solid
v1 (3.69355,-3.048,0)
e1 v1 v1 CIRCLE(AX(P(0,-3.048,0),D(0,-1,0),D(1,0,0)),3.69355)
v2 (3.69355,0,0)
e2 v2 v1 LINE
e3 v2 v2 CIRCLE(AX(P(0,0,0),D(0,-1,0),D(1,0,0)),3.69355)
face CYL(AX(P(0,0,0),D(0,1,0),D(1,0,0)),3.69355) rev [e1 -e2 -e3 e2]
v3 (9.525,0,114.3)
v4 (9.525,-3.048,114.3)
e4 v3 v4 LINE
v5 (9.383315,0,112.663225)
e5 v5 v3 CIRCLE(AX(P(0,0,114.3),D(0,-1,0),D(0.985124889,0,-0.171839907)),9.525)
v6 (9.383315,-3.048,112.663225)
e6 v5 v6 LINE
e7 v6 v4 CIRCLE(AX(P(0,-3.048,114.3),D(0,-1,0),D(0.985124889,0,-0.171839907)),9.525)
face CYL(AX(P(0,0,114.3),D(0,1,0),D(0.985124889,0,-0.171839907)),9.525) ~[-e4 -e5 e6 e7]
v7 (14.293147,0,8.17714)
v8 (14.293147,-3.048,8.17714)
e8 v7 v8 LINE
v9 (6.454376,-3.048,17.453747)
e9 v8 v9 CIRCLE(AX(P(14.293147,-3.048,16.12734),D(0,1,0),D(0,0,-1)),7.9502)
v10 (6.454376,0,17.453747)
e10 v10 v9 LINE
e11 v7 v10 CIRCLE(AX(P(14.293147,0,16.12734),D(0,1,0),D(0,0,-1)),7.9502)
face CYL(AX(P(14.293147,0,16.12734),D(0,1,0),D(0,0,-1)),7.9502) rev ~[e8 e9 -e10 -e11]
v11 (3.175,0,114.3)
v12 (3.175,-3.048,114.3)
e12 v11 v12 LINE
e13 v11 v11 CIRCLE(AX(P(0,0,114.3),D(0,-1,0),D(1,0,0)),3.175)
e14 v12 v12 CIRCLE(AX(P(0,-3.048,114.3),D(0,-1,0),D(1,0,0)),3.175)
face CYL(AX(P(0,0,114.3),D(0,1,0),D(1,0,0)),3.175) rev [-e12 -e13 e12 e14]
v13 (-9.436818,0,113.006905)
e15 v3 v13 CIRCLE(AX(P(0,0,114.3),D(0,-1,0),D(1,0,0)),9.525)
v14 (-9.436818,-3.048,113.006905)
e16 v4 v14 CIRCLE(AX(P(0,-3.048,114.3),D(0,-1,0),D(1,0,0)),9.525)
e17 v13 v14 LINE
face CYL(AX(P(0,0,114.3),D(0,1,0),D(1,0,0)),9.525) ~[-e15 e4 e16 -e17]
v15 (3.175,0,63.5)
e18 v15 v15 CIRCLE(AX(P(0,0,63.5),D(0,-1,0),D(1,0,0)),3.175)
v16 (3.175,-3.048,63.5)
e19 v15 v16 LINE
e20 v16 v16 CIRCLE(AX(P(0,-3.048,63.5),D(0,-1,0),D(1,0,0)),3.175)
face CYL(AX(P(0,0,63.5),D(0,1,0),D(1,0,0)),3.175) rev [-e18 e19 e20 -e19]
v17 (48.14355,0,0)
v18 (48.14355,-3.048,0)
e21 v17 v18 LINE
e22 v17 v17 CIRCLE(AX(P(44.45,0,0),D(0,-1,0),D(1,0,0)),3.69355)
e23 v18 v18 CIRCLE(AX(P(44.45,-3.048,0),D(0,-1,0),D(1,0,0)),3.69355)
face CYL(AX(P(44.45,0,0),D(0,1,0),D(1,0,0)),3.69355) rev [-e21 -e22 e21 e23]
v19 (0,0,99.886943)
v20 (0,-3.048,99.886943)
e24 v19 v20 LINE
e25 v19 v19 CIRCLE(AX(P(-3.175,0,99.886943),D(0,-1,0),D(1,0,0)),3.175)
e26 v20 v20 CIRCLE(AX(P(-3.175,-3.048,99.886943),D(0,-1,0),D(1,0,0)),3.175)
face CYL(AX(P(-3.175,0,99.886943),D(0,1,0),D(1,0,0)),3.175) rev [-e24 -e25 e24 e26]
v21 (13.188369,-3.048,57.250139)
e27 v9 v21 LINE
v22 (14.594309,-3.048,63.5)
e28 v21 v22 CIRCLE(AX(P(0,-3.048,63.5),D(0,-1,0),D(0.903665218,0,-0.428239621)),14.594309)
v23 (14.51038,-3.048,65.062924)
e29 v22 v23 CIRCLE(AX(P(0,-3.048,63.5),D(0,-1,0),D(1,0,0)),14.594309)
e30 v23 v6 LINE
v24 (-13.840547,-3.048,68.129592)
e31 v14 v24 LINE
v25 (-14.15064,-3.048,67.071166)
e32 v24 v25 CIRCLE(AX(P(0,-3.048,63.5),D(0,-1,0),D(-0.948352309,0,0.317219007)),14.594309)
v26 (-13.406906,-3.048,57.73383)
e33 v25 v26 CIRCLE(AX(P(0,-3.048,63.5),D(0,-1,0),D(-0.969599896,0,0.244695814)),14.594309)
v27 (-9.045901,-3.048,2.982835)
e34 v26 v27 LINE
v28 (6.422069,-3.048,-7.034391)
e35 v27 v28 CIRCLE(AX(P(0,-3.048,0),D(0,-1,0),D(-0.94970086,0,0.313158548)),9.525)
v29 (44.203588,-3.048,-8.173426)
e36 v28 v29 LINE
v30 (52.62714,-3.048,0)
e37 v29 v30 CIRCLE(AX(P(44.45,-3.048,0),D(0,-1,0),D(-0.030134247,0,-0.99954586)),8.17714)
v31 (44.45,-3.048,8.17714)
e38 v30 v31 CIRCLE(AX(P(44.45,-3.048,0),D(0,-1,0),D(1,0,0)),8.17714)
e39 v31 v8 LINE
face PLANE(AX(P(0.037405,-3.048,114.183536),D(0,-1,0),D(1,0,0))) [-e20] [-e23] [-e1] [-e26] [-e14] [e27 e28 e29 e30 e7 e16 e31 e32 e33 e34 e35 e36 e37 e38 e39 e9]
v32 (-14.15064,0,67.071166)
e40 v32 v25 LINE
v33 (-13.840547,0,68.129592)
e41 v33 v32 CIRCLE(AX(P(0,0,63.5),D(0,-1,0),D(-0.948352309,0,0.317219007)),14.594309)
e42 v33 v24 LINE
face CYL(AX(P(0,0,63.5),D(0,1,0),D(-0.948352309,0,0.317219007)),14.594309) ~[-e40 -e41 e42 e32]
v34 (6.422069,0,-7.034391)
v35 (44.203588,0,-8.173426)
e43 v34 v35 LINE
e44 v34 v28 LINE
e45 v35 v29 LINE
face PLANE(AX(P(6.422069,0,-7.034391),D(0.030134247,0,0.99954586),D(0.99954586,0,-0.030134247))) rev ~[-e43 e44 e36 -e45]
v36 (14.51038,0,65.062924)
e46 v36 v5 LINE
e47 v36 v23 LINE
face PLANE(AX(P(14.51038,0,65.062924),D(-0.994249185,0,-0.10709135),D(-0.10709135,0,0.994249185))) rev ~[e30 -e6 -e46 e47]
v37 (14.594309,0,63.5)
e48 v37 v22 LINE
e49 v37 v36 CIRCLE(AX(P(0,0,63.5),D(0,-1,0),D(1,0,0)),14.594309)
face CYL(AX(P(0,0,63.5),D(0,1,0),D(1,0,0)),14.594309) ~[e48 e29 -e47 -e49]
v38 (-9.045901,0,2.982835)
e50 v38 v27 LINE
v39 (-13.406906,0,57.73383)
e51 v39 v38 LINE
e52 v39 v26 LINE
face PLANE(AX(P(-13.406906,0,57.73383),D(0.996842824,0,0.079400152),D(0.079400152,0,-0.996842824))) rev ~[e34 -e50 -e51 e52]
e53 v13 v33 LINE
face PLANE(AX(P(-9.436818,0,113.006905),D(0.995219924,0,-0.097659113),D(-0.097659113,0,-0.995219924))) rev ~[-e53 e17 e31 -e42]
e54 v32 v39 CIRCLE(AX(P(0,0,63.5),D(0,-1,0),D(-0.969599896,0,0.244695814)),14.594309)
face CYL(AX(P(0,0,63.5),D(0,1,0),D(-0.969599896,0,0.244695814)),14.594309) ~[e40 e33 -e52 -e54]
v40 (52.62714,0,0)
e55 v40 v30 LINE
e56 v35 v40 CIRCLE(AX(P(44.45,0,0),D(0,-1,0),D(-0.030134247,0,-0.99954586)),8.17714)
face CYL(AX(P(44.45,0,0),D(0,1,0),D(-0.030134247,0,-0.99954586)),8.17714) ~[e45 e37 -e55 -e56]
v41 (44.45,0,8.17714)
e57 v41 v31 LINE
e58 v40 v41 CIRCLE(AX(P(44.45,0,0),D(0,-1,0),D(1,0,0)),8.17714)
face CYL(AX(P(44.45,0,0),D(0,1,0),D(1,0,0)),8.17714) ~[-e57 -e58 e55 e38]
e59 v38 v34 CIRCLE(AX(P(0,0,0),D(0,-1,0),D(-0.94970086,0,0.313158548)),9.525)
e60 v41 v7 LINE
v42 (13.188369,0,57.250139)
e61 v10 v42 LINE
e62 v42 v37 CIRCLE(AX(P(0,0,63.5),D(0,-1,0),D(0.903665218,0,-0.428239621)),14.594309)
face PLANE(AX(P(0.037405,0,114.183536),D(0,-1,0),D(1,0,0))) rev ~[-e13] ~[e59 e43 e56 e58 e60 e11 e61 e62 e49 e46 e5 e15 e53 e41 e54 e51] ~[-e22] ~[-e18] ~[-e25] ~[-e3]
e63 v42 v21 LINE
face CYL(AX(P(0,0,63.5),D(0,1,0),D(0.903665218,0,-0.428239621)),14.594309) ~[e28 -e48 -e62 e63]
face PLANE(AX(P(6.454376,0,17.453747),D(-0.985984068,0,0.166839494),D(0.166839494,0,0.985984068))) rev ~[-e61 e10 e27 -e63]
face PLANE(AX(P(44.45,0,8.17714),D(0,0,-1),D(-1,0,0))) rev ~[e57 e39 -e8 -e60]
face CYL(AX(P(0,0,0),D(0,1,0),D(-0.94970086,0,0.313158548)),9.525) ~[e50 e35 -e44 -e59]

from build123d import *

# Parameters (mm, degrees)
F0_R     = 3.175
F0_R_2   = 3.6935498759
F1_DEPTH = 3.048


# Not quite as in the source:
# - the program builds the solid bodies; features that only make, move or delete a surface that nothing else refers to are left out


with BuildPart() as f1:
    # F0 (on Front) → F1 (new body)
    with BuildSketch(Plane.XZ):
        with BuildLine():
            ThreePointArc((9.3833145649, 112.6632248852), (9.4895125331, 113.4785519586), (9.525, 114.3))
            ThreePointArc((9.525, 114.3), (-0.6480489734, 123.8029288921), (-9.4368178537, 113.0069053411))
            ThreePointArc((-9.4368178537, 113.0069053411), (-0.1739100757, 104.7765877814), (9.3833145649, 112.6632248852))
        make_face()
        with Locations((0, 114.3)):
            Circle(F0_R, mode=Mode.SUBTRACT)
        with BuildLine():
            ThreePointArc((9.3833145649, 112.6632248852), (-0.1739100757, 104.7765877814), (-9.4368178537, 113.0069053411))
            Line((-9.4368178537, 113.0069053411), (-13.8405466215, 68.1295922048))
            ThreePointArc((-13.8405466215, 68.1295922048), (1.5694846966, 78.00967169), (14.510379821, 65.0629242514))
            Line((14.510379821, 65.0629242514), (9.3833145649, 112.6632248852))
        make_face()
        with Locations((-3.175, 99.886942851)):
            Circle(F0_R, mode=Mode.SUBTRACT)
        with BuildLine():
            ThreePointArc((14.510379821, 65.0629242514), (1.5694846966, 78.00967169), (-13.8405466215, 68.1295922048))
            ThreePointArc((-13.8405466215, 68.1295922048), (-14.0055954943, 67.6033095928), (-14.1506404779, 67.0711663123))
            Line((-14.1506404779, 67.0711663123), (-13.406906479, 57.7338302637))
            ThreePointArc((-13.406906479, 57.7338302637), (-0.26538464, 48.9081041068), (13.1883694151, 57.2501386467))
            Line((13.1883694151, 57.2501386467), (14.510379821, 65.0629242514))
        make_face()
        with Locations((0, 63.5)):
            Circle(F0_R, mode=Mode.SUBTRACT)
        with BuildLine():
            ThreePointArc((14.5943089855, 63.5), (14.5733115895, 64.2825880654), (14.510379821, 65.0629242514))
            Line((14.510379821, 65.0629242514), (13.1883694151, 57.2501386467))
            ThreePointArc((13.1883694151, 57.2501386467), (14.2384864544, 60.2969767012), (14.5943089855, 63.5))
        make_face()
        with BuildLine():
            Line((-13.406906479, 57.7338302637), (-14.1506404779, 67.0711663123))
            ThreePointArc((-14.1506404779, 67.0711663123), (-14.5482321844, 62.3412096509), (-13.406906479, 57.7338302637))
        make_face()
        with BuildLine():
            Line((6.4543763873, 17.4537470642), (13.1883694151, 57.2501386467))
            ThreePointArc((13.1883694151, 57.2501386467), (-0.26538464, 48.9081041068), (-13.406906479, 57.7338302637))
            Line((-13.406906479, 57.7338302637), (-9.0459006939, 2.9828351674))
            ThreePointArc((-9.0459006939, 2.9828351674), (1.5105331659, 9.4044624809), (9.525, 0))
            ThreePointArc((9.525, 0), (8.7148100466, -3.8441788267), (6.4220685875, -7.0343912357))
            Line((6.4220685875, -7.0343912357), (44.2035880522, -8.173426155))
            ThreePointArc((44.2035880522, -8.173426155), (36.2737887259, 0.1232199644), (44.45, 8.1771397175))
            Line((44.45, 8.1771397175), (14.2931469281, 8.1771397175))
            ThreePointArc((14.2931469281, 8.1771397175), (8.220631645, 10.996039865), (6.4543763873, 17.4537470642))
        make_face()
        with BuildLine():
            ThreePointArc((9.525, 0), (1.5105331659, 9.4044624809), (-9.0459006939, 2.9828351674))
            ThreePointArc((-9.0459006939, 2.9828351674), (-5.1775795439, -7.9948918108), (6.4220685875, -7.0343912357))
            ThreePointArc((6.4220685875, -7.0343912357), (8.7148100466, -3.8441788267), (9.525, 0))
        make_face()
        Circle(F0_R_2, mode=Mode.SUBTRACT)
        with BuildLine():
            ThreePointArc((52.6271397175, 0), (50.2321109449, 5.7821109449), (44.45, 8.1771397175))
            ThreePointArc((44.45, 8.1771397175), (36.2737887259, 0.1232199644), (44.2035880522, -8.173426155))
            ThreePointArc((44.2035880522, -8.173426155), (50.1443247639, -5.8685841088), (52.6271397175, 0))
        make_face()
        with Locations((44.45, 0)):
            Circle(F0_R_2, mode=Mode.SUBTRACT)
    extrude(amount=F1_DEPTH)


solid = f1.part
